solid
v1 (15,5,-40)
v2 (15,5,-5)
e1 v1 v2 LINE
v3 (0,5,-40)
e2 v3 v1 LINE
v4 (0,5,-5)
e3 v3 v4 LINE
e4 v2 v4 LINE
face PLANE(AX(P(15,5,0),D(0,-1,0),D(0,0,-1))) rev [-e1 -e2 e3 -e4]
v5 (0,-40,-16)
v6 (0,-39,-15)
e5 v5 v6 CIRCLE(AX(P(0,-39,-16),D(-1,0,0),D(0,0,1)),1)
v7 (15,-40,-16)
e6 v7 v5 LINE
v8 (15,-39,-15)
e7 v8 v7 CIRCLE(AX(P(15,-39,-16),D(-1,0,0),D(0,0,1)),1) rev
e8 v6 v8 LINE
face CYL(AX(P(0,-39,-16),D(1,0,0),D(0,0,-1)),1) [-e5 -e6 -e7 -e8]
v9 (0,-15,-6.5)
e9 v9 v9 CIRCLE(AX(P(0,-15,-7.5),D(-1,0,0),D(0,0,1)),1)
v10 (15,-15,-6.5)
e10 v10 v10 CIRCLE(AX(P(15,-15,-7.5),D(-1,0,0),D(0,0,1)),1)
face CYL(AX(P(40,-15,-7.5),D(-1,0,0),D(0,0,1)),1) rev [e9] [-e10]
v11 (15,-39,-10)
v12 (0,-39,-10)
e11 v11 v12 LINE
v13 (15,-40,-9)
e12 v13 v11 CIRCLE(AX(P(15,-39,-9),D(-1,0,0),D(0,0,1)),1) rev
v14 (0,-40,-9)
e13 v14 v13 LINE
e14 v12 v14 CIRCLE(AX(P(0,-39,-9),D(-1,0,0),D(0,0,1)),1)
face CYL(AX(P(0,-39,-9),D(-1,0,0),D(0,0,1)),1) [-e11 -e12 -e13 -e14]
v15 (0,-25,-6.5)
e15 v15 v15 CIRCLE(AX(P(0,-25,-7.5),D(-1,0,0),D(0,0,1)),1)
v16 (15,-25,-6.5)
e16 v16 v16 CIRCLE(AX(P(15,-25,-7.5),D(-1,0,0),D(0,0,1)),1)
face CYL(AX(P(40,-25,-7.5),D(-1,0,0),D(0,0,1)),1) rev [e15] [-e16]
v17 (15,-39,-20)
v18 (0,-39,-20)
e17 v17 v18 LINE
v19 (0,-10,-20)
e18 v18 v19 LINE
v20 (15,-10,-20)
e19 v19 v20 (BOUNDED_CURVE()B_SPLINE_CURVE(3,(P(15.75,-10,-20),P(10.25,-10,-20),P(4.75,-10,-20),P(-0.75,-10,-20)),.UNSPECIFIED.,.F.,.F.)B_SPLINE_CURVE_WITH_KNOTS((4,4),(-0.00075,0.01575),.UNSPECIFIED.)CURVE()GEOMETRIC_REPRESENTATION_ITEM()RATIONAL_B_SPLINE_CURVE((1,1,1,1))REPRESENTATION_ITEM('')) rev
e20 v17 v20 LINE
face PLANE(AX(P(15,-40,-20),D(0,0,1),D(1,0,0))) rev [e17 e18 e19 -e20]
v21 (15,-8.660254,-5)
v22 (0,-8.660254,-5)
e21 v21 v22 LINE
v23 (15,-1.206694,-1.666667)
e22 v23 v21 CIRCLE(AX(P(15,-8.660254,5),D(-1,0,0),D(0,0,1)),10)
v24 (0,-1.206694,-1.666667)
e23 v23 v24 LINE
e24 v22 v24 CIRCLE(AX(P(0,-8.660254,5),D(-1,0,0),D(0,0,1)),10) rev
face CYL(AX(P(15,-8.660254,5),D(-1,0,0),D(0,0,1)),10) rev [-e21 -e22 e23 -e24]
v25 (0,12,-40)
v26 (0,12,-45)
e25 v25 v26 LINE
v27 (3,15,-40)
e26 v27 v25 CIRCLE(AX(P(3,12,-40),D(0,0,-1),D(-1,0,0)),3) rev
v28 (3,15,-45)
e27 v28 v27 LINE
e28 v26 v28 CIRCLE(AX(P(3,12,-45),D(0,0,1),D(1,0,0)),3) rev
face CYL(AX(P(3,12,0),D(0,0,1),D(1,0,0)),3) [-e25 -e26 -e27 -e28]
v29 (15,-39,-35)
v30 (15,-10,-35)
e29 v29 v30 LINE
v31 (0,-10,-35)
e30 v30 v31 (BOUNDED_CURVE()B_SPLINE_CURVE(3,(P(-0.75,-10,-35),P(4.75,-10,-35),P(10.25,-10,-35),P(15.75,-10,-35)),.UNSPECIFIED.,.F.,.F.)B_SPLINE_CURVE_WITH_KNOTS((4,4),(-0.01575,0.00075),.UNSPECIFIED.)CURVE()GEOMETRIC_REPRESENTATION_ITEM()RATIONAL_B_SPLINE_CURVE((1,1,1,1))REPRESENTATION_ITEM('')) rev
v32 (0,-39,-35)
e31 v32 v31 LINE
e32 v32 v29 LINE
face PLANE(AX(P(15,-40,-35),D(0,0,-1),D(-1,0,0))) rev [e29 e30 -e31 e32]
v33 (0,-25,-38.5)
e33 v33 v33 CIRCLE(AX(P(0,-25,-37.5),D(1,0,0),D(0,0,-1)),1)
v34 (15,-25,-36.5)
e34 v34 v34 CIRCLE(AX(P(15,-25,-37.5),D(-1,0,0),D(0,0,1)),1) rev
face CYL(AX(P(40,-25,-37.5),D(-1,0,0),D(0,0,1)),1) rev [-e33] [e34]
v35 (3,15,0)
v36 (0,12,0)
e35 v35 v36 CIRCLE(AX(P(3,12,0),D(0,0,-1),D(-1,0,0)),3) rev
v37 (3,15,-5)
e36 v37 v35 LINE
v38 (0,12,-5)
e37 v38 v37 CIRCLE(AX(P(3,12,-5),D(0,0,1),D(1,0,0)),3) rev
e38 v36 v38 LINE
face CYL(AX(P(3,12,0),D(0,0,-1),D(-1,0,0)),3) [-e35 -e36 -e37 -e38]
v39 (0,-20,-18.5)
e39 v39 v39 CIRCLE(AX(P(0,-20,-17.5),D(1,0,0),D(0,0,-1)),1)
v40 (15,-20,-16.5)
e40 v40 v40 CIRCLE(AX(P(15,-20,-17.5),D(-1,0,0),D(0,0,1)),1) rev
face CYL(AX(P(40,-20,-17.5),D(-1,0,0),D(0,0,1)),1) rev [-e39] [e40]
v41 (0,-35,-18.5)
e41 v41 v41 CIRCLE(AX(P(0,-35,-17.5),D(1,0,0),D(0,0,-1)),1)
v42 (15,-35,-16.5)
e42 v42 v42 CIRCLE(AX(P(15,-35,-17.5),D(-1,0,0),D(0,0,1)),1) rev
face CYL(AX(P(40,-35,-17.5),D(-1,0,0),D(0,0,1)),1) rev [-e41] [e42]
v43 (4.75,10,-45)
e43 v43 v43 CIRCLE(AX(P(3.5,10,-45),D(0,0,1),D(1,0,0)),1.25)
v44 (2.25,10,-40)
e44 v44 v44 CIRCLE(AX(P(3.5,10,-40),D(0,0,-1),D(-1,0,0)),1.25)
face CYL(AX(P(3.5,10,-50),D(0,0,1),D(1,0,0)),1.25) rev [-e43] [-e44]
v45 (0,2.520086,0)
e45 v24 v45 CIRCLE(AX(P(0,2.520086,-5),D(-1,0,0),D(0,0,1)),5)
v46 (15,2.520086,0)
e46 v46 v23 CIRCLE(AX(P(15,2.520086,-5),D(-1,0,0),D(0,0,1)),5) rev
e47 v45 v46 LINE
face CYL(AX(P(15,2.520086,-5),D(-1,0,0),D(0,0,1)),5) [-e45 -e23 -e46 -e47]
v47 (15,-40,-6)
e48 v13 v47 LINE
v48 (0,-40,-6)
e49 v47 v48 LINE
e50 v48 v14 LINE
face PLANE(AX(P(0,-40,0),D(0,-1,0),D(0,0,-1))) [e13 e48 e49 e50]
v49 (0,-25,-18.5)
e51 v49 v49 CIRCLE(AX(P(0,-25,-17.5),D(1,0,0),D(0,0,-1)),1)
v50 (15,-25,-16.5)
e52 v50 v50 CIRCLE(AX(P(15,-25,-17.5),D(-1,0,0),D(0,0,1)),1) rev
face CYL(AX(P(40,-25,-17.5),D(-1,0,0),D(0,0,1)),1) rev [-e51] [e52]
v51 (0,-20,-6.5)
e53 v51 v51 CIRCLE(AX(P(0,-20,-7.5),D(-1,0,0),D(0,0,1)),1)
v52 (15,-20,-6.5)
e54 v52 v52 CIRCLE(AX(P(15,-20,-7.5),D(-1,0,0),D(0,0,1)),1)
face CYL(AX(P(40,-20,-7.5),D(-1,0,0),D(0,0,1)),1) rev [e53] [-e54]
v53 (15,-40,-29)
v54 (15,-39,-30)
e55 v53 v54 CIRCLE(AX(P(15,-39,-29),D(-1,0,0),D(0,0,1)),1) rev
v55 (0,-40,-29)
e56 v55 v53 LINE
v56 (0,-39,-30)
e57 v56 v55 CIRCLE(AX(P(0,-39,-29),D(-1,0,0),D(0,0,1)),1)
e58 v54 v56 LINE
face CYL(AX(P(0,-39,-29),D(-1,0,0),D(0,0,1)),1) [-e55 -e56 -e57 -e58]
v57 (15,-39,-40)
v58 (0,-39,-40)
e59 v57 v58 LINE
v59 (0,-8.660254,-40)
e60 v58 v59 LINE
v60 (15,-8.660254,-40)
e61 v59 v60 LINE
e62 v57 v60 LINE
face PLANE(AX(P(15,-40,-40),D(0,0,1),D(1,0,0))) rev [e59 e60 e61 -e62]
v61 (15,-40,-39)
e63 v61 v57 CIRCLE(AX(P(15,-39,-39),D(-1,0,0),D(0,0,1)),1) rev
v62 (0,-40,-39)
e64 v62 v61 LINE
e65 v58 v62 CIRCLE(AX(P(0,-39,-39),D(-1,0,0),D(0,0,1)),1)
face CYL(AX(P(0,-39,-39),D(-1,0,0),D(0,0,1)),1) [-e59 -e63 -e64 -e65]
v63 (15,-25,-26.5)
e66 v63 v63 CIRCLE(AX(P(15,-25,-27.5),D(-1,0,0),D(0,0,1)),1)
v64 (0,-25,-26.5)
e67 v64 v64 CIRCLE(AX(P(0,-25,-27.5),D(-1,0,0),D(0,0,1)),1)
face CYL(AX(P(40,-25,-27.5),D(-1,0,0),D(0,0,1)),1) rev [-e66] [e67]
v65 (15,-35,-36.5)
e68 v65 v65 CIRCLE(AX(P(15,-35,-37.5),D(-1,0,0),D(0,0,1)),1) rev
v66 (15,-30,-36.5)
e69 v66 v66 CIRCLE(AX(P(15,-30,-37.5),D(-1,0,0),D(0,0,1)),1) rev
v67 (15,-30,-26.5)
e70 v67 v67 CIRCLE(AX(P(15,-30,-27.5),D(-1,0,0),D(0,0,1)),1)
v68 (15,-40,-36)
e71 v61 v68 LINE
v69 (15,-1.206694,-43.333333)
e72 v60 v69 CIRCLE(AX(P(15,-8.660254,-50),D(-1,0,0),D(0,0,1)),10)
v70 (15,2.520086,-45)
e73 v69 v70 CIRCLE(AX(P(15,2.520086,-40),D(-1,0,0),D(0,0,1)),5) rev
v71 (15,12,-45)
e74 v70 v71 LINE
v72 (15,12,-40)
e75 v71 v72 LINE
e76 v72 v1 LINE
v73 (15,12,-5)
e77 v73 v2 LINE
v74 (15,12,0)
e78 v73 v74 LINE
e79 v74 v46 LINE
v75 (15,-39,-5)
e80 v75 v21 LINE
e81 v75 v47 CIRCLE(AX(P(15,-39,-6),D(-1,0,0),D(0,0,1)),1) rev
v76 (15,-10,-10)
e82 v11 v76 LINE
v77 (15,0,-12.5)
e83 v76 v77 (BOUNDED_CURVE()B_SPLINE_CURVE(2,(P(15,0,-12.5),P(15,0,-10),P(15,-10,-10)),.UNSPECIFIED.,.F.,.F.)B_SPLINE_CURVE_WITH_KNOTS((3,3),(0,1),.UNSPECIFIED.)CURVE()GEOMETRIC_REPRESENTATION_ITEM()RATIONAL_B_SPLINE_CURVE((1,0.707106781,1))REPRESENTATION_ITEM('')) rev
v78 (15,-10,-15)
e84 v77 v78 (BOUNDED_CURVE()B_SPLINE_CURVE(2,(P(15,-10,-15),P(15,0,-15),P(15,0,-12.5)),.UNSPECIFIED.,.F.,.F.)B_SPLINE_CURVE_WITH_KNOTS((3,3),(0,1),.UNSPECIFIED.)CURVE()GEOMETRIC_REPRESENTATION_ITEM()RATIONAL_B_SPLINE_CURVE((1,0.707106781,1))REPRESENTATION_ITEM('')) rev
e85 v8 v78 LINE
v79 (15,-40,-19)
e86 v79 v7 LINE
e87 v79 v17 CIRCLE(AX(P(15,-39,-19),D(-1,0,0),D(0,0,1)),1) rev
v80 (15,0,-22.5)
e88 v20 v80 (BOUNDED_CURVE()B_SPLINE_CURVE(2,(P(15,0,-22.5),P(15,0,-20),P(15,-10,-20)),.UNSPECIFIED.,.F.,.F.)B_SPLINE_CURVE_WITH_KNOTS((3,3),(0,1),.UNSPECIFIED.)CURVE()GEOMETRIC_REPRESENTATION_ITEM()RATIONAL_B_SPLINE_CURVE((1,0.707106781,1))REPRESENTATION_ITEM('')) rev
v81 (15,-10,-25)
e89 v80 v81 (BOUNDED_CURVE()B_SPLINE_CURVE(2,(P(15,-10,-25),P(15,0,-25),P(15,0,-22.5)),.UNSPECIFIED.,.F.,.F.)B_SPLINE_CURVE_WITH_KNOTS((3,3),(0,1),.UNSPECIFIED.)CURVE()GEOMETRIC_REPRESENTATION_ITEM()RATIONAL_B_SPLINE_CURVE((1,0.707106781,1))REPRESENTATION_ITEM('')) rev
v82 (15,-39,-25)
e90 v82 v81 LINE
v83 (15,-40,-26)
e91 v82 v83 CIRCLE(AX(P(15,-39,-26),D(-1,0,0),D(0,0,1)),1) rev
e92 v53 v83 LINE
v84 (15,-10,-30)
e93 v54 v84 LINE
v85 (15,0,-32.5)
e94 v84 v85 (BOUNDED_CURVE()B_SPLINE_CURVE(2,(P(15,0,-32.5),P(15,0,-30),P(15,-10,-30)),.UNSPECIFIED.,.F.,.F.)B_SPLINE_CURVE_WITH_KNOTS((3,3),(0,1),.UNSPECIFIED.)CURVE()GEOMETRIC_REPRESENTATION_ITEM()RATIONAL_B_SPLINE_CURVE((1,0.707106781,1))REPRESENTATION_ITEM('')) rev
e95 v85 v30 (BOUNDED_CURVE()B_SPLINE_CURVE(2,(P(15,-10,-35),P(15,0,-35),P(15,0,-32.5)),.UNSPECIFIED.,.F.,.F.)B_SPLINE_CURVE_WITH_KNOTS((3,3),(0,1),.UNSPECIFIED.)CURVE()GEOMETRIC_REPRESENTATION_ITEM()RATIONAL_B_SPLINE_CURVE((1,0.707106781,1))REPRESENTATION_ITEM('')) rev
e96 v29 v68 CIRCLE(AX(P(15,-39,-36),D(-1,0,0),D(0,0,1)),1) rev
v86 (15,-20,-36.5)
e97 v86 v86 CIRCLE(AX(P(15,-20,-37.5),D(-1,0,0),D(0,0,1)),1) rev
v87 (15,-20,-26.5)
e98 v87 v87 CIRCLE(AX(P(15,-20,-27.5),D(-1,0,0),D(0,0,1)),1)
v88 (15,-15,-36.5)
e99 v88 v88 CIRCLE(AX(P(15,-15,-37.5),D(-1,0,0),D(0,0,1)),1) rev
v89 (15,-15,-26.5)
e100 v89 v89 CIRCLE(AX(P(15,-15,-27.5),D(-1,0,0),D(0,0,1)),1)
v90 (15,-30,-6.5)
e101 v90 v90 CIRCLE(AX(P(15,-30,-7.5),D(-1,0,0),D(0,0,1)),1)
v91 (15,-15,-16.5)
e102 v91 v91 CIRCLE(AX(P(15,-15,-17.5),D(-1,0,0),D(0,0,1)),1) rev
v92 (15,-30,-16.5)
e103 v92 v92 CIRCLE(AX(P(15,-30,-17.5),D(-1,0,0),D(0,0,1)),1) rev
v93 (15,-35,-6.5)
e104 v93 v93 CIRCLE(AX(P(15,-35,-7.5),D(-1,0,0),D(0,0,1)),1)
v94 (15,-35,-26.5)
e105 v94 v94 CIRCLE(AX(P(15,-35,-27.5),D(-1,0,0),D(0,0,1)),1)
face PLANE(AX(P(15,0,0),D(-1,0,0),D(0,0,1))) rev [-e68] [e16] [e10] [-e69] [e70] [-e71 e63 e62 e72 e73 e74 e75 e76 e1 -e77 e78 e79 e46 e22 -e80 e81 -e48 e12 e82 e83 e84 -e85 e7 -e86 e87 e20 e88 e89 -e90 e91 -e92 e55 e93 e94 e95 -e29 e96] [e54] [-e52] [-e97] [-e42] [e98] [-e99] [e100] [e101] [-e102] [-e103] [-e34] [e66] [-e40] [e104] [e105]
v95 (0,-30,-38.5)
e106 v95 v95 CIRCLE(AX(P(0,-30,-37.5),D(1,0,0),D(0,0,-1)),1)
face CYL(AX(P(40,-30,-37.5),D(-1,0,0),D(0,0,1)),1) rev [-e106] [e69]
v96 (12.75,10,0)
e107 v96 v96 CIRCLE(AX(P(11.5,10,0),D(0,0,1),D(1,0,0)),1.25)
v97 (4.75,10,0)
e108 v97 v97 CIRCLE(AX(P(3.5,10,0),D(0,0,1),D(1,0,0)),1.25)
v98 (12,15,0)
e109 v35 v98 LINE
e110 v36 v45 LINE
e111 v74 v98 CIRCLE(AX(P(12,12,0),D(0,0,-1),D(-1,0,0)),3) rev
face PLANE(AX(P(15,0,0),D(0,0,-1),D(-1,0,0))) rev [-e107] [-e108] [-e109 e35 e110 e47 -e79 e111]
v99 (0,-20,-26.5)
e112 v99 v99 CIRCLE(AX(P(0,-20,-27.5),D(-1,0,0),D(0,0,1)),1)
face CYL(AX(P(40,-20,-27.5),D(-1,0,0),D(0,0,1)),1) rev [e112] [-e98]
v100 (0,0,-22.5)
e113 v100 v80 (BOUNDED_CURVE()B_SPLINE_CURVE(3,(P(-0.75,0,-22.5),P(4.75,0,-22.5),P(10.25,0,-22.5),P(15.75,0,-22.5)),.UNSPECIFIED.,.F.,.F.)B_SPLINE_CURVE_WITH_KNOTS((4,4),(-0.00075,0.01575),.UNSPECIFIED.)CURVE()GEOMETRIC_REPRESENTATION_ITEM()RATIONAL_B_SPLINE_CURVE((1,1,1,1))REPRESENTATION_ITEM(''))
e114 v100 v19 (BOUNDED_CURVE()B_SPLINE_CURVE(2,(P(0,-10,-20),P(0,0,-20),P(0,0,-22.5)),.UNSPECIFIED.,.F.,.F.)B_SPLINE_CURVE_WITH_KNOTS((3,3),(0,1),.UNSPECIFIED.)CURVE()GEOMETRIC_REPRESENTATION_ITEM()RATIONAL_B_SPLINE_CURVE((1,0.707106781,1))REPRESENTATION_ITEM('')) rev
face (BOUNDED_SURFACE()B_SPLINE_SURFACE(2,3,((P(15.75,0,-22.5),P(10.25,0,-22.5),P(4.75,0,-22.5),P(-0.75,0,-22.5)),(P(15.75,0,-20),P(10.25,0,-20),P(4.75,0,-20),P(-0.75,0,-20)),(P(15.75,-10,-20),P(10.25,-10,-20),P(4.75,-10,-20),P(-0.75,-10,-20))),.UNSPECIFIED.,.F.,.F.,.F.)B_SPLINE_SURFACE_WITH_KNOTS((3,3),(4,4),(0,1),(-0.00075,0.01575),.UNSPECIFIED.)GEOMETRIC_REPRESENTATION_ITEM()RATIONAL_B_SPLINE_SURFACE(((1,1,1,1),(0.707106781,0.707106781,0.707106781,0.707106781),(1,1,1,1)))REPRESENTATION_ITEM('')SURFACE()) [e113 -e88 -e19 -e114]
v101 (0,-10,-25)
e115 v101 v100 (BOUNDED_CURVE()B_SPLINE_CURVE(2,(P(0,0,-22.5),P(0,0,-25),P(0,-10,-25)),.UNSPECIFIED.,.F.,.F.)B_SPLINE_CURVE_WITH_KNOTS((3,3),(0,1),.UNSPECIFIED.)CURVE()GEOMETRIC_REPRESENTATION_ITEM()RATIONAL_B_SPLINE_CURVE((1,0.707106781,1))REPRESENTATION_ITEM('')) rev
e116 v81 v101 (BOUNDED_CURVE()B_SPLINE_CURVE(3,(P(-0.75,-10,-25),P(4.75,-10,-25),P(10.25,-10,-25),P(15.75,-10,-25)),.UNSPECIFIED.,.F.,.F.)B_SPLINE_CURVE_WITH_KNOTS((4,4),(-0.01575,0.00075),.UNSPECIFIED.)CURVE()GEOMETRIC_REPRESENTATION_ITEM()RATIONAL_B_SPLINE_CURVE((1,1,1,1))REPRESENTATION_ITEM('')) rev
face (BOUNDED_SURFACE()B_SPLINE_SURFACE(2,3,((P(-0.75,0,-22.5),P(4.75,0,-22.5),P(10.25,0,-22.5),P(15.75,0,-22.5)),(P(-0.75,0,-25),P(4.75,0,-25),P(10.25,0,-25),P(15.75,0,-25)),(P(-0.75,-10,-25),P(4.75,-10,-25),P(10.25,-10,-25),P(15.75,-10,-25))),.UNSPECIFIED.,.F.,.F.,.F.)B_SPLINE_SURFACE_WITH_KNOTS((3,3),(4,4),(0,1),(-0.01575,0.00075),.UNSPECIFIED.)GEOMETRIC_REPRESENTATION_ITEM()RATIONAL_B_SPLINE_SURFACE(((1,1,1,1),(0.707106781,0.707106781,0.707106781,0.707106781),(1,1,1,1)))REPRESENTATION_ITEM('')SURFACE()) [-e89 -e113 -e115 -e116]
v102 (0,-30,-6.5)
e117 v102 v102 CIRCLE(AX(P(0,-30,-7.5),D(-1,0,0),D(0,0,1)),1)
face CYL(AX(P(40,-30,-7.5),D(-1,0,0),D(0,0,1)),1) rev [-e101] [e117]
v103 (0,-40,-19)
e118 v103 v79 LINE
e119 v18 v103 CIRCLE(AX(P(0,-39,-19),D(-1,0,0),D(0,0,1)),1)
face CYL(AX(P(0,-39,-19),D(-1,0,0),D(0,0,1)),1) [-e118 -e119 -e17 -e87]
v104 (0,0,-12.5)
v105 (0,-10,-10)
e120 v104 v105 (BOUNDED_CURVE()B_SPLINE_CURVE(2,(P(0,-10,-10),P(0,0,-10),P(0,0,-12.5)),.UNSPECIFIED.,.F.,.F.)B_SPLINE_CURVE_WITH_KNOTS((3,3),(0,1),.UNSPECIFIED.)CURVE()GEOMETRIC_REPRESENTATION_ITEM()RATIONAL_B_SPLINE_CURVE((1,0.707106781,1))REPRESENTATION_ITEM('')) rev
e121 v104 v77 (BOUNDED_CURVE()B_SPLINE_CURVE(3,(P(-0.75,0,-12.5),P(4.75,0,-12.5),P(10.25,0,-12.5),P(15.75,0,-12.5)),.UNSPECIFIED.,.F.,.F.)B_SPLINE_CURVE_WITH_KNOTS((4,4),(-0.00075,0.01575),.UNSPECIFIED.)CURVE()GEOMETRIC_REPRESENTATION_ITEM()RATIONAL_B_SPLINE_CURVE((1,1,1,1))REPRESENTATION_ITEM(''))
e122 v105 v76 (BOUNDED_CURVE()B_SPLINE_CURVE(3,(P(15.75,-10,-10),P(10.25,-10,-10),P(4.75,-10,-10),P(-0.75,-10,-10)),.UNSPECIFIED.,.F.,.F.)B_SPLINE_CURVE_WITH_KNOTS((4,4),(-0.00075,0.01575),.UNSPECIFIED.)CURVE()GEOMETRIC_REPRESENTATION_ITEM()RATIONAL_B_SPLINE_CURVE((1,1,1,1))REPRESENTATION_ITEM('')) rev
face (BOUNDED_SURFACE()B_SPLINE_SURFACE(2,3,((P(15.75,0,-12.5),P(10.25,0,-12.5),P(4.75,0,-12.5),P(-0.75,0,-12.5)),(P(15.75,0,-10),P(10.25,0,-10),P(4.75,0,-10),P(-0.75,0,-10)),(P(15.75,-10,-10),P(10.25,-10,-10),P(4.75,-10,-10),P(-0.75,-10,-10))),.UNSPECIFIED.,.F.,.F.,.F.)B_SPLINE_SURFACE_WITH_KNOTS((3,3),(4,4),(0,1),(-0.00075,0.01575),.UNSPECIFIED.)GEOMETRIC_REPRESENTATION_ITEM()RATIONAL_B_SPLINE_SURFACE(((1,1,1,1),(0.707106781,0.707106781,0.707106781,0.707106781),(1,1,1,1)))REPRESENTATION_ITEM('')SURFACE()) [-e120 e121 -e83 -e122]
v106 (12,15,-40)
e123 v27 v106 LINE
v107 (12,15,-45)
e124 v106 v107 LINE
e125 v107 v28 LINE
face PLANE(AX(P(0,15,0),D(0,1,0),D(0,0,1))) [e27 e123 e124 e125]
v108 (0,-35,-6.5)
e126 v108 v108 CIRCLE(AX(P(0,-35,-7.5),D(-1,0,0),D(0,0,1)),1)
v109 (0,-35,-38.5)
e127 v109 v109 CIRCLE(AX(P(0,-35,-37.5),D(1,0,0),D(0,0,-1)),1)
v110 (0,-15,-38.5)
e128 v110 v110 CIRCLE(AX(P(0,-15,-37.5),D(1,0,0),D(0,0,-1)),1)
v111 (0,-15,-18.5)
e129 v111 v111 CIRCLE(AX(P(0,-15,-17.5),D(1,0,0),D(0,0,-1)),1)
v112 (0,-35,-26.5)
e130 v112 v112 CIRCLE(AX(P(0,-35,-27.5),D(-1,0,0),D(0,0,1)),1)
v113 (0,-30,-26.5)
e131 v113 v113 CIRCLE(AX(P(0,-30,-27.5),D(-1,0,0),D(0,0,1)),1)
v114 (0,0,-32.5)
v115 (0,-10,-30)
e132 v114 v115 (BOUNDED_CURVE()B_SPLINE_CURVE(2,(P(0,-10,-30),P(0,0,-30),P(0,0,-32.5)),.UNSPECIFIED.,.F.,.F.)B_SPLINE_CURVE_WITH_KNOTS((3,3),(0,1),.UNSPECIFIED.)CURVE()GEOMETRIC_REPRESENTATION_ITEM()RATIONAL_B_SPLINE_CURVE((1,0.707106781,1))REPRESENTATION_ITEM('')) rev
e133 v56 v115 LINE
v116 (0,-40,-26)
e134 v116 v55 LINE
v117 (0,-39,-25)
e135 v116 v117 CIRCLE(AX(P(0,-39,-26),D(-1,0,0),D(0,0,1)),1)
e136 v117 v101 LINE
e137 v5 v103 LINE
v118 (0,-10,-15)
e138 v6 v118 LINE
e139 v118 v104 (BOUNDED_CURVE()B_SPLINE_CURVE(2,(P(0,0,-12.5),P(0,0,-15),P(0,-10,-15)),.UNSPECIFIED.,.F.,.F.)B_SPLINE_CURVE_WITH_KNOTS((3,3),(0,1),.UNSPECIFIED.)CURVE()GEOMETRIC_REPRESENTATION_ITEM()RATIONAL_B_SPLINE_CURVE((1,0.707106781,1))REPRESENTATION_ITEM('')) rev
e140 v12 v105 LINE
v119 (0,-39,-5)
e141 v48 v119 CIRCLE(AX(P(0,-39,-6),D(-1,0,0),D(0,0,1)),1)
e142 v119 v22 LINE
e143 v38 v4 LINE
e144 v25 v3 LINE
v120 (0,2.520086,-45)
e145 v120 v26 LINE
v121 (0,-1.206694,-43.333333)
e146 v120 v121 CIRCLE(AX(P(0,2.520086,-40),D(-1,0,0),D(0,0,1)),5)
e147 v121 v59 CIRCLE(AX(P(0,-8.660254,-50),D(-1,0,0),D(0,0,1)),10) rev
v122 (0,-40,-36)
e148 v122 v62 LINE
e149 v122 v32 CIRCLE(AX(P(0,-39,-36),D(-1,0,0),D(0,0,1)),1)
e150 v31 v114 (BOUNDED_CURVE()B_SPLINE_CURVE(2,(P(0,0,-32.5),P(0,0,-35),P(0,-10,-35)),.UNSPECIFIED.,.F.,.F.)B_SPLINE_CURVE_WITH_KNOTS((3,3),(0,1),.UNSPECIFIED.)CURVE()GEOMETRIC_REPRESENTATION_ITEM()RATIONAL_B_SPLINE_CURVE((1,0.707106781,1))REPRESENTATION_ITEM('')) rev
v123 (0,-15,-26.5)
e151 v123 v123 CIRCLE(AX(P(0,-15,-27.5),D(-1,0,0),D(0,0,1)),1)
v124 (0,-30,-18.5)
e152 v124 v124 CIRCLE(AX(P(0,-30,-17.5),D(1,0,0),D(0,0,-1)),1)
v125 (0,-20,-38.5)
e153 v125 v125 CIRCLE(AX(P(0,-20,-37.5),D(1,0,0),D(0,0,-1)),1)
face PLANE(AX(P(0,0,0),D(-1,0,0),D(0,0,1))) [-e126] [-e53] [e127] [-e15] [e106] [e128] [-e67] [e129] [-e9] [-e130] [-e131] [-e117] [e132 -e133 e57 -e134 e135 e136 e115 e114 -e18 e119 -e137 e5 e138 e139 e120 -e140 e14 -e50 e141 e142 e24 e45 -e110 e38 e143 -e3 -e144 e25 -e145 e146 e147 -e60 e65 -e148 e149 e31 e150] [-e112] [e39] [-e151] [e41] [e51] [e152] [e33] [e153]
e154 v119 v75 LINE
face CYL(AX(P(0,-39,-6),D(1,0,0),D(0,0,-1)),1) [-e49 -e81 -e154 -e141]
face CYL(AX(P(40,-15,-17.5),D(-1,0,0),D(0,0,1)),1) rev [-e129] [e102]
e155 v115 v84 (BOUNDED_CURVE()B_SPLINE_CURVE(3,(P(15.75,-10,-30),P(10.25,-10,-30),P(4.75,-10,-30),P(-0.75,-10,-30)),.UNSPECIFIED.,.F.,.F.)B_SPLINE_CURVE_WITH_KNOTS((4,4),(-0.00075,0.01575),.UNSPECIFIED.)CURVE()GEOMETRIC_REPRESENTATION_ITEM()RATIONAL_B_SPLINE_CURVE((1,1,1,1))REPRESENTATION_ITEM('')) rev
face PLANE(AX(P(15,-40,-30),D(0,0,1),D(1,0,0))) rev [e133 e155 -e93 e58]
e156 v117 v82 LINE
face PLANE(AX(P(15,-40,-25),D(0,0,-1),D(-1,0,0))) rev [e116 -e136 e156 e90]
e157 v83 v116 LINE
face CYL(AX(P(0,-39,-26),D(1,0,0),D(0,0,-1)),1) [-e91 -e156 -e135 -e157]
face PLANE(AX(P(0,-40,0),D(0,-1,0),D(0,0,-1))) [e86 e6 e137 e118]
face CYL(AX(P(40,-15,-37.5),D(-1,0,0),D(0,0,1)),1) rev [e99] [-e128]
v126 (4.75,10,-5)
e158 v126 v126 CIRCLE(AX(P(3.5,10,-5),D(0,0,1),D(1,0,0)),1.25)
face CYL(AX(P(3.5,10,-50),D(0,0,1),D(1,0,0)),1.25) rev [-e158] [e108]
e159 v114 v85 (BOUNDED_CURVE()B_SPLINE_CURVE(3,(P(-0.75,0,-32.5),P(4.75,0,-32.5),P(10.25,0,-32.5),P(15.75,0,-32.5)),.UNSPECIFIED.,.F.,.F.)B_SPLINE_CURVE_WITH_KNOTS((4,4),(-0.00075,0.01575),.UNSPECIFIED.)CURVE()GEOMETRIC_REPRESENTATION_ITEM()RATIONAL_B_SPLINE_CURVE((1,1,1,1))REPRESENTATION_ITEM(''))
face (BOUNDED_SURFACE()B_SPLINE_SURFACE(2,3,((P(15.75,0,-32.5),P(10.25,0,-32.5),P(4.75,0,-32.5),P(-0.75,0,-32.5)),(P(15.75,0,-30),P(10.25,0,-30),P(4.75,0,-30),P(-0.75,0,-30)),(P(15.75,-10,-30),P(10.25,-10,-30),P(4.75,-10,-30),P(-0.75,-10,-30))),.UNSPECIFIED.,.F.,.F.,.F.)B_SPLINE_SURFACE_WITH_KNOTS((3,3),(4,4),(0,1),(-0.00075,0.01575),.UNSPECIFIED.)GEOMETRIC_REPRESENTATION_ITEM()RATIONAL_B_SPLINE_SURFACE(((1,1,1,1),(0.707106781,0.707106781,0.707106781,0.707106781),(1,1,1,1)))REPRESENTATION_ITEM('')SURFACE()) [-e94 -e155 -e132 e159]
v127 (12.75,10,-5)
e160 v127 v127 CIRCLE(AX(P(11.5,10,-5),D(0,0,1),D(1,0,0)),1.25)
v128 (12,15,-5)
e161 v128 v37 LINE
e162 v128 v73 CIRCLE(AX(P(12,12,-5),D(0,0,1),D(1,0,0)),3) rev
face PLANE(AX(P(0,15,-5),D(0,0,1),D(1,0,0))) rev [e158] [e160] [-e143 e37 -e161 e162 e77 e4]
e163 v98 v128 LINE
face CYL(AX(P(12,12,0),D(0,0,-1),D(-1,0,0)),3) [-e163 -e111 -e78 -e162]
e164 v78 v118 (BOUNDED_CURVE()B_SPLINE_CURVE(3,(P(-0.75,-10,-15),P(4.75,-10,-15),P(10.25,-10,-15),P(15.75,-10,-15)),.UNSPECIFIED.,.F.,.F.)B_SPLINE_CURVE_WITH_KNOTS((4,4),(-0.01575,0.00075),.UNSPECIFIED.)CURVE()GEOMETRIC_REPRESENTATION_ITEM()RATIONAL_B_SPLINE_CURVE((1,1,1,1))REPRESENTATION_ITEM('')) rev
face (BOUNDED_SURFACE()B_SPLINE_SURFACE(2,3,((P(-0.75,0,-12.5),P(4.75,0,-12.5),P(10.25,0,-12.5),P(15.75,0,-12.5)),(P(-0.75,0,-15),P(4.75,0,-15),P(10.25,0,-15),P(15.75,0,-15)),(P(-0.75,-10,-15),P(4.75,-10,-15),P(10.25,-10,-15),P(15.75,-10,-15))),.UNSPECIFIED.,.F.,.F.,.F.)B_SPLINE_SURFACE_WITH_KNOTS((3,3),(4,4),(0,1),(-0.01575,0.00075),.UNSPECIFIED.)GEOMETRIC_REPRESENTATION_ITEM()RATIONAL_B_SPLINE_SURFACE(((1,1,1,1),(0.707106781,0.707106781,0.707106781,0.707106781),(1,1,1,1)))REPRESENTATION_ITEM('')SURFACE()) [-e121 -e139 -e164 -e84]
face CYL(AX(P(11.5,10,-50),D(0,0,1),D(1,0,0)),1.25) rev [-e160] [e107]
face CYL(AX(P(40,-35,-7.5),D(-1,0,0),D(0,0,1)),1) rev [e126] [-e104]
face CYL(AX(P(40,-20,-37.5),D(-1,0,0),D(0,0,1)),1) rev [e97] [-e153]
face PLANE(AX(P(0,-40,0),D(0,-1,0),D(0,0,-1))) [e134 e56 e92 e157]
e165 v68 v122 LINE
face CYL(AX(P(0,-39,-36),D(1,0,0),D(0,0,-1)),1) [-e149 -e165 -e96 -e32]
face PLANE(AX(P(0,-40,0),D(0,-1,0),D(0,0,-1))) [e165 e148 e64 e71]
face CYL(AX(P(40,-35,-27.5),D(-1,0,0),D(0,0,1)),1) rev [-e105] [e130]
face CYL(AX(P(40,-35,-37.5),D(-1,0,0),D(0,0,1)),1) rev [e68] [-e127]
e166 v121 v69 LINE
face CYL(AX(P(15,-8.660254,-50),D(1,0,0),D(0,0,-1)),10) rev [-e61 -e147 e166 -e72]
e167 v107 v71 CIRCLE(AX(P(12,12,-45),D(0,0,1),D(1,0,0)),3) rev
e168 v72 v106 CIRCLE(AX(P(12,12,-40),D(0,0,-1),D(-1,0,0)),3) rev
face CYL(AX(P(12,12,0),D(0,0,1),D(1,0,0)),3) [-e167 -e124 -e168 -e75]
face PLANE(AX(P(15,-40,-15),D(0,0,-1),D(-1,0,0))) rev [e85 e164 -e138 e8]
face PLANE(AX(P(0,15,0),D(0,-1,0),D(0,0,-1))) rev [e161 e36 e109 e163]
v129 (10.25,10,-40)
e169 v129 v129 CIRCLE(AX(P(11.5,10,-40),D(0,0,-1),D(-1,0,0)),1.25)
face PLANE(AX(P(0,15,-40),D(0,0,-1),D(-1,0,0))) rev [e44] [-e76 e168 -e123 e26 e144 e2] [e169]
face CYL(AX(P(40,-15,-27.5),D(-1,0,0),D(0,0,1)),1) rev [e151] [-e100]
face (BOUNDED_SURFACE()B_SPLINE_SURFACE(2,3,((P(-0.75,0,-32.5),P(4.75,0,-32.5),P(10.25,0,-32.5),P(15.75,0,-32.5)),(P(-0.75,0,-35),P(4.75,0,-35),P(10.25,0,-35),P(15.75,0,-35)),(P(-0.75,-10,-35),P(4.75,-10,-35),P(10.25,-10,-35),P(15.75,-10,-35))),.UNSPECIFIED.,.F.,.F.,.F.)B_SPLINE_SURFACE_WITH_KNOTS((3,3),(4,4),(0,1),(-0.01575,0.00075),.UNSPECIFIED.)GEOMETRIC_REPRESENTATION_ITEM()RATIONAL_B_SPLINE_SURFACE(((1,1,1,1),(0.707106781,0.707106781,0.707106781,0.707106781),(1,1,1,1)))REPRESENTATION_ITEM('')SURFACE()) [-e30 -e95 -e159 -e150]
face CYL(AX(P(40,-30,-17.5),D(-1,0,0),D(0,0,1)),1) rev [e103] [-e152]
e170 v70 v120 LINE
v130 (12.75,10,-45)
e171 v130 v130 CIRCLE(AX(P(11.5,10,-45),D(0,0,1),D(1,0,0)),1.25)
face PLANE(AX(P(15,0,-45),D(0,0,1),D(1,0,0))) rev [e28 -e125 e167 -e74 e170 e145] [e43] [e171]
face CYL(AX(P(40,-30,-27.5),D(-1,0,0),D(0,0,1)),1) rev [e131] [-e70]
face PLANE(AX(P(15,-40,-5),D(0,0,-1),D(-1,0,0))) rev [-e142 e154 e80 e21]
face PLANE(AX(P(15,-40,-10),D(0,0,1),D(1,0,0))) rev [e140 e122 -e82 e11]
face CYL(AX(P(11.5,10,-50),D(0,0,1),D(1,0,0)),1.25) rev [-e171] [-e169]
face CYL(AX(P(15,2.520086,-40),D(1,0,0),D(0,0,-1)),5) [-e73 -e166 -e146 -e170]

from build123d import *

# Parameters (mm, degrees)
SKETCH_3_W               = 45
SKETCH_3_H               = 5
EXTRUDE_2_DEPTH          = 15
SKETCH_4_W               = 15
SKETCH_4_H               = 5
EXTRUDE_3_DEPTH          = 10
SKETCH_6_R               = 1.25
CUT_EXTRUDE_3_DEPTH      = 50
FILLET_3_R               = 3
SKETCH_7_W               = 15
SKETCH_7_H               = 5
EXTRUDE_4_DEPTH          = 40
FILLET_4_R               = 10
FILLET_5_R               = 5
FILLET_6_R               = 1
FILLET_7_SIZE            = 10
FILLET_7_SIZE_2          = 2.5
SKETCH_8_R               = 1
CUT_EXTRUDE_4_DEPTH      = 40
MIRROR_2_COPY_1_SKETCH_R = 1
MIRROR_2_COPY_1_DEPTH    = 40
MIRROR_2_COPY_2_SKETCH_R = 1
MIRROR_2_COPY_2_DEPTH    = 40
MIRROR_2_COPY_3_SKETCH_R = 1
MIRROR_2_COPY_3_DEPTH    = 40


with BuildPart() as part:
    # 草图3 → 凸台-拉伸2 (new body)
    with BuildSketch(Plane(origin=(0, 0, 0), x_dir=(0, 0, -1), z_dir=(1, 0, 0))):
        with Locations((22.5, 2.5)):
            Rectangle(SKETCH_3_W, SKETCH_3_H)
    extrude(amount=EXTRUDE_2_DEPTH)

    # 草图4 → 凸台-拉伸3 (add)
    with BuildSketch(Plane(origin=(0, 5, 0), x_dir=(1, 0, 0), z_dir=(0, 1, 0))):
        with Locations((7.5, 42.5)):
            Rectangle(SKETCH_4_W, SKETCH_4_H)
        with Locations((7.5, 2.5)):
            Rectangle(SKETCH_4_W, SKETCH_4_H)
    extrude(amount=EXTRUDE_3_DEPTH)

    # 草图6 → 切除-拉伸3 (cut)
    with BuildSketch(Plane.XY):
        with Locations((3.5, 10)):
            Circle(SKETCH_6_R)
        with Locations((11.5, 10)):
            Circle(SKETCH_6_R)
    extrude(amount=-CUT_EXTRUDE_3_DEPTH, mode=Mode.SUBTRACT)

    # 圆角3
    fillet_3_edges = [part.edges().sort_by_distance(p)[0] for p in [
        (0, 15, -42.5),
        (15, 15, -42.5),
        (0, 15, -2.5),
        (15, 15, -2.5),
    ]]
    fillet(fillet_3_edges, radius=FILLET_3_R)

    # 草图7 → 凸台-拉伸4 (add)
    with BuildSketch(Plane(origin=(0, 0, 0), x_dir=(-1, 0, 0), z_dir=(0, -1, 0))):
        with Locations((-7.5, 27.5)):
            Rectangle(SKETCH_7_W, SKETCH_7_H)
        with Locations((-7.5, 17.5)):
            Rectangle(SKETCH_7_W, SKETCH_7_H)
        with Locations((-7.5, 37.5)):
            Rectangle(SKETCH_7_W, SKETCH_7_H)
        with Locations((-7.5, 7.5)):
            Rectangle(SKETCH_7_W, SKETCH_7_H)
    extrude(amount=EXTRUDE_4_DEPTH)

    # 圆角4
    # the kernel refuses this fillet: 10 mm, written as the material it adds along each edge
    with BuildSketch(Plane(origin=(0, 0, -5), x_dir=(0, 0, 1), z_dir=(1, 0, 0)), Plane(origin=(15, 0, -40), x_dir=(0, 0, -1), z_dir=(-1, 0, 0))) as fillet_4_piece_1:
        with BuildLine():
            CenterArc((10, 8.660254038), FILLET_4_R, 180, 60)
            Line((0, 8.660254038), (-0.2, 8.660254038))
            Line((-0.2, 8.660254038), (-0.2, 0))
            Line((-0.2, 0), (0, -0.2))
            ThreePointArc((0, -0.2), (2.5, -0.2), (4.9, -0.173205081))
            Line((4.9, -0.173205081), (5, 0))
        make_face()
    extrude(amount=15)

    # 圆角5
    fillet_5_edges = [part.edges().sort_by_distance(p)[0] for p in [
        (7.5, 0, -45),
        (7.5, 0, 0),
    ]]
    fillet(fillet_5_edges, radius=FILLET_5_R)

    # 圆角6
    fillet_6_edges = [part.edges().sort_by_distance(p)[0] for p in [
        (7.5, -40, -15),
        (7.5, -40, -20),
        (7.5, -40, -35),
        (7.5, -40, -40),
        (7.5, -40, -5),
        (7.5, -40, -10),
        (7.5, -40, -25),
        (7.5, -40, -30),
    ]]
    fillet(fillet_6_edges, radius=FILLET_6_R)

    # 圆角7
    # an asymmetric fillet: 10, 2.5 mm, written as the material it adds along each edge
    with BuildSketch(Plane(origin=(15, 0, -10), x_dir=(0, -1, 0), z_dir=(-1, 0, 0)), Plane(origin=(15, 0, -20), x_dir=(0, -1, 0), z_dir=(-1, 0, 0)), Plane(origin=(15, 0, -30), x_dir=(0, -1, 0), z_dir=(-1, 0, 0)), Plane(origin=(0, 0, -35), x_dir=(0, -1, 0), z_dir=(1, 0, 0))) as fillet_7_piece_1:
        with BuildLine():
            Bezier((FILLET_7_SIZE, 0), (0, 0), (0, -FILLET_7_SIZE_2), weights=[1, 0.707106781, 1])
            Line((0, -FILLET_7_SIZE_2), (0, 0))
            Line((0, 0), (FILLET_7_SIZE, 0))
        make_face()
    extrude(amount=15)
    with BuildSketch(Plane(origin=(0, 0, -15), x_dir=(0, 0, 1), z_dir=(1, 0, 0)), Plane(origin=(0, 0, -25), x_dir=(0, 0, 1), z_dir=(1, 0, 0))) as fillet_7_piece_2:
        with BuildLine():
            Bezier((FILLET_7_SIZE_2, 0), (0, 0), (0, FILLET_7_SIZE), weights=[1, 0.707106781, 1])
            Line((0, FILLET_7_SIZE), (0, 0))
            Line((0, 0), (FILLET_7_SIZE_2, 0))
        make_face()
    extrude(amount=15)

    # 草图8 → 切除-拉伸4 (cut)
    with BuildSketch(Plane.ZY):
        with Locations((-27.5, -15)):
            Circle(SKETCH_8_R)
        with Locations((-27.5, -20)):
            Circle(SKETCH_8_R)
        with Locations((-27.5, -25)):
            Circle(SKETCH_8_R)
        with Locations((-27.5, -30)):
            Circle(SKETCH_8_R)
        with Locations((-27.5, -35)):
            Circle(SKETCH_8_R)
    cut_extrude_4 = extrude(amount=-CUT_EXTRUDE_4_DEPTH, mode=Mode.SUBTRACT)

    # 镜向1: 切除-拉伸4 across plane
    add(cut_extrude_4.mirror(Plane(origin=(0, 0, -32.5), x_dir=(1, 0, 0), z_dir=(0, 0, -1))), mode=Mode.SUBTRACT)

    # 镜向1 at the second plane: 切除-拉伸4 across plane
    add(cut_extrude_4.mirror(Plane(origin=(0, 0, -22.5), x_dir=(1, 0, 0), z_dir=(0, 0, -1))), mode=Mode.SUBTRACT)

    # 镜向2 copy 1 sketch → 镜向2 copy 1 (cut)
    with BuildSketch(Plane(origin=(0, 0, 20), x_dir=(0, 0, 1), z_dir=(-1, 0, 0))):
        with Locations((-27.5, -15)):
            Circle(MIRROR_2_COPY_1_SKETCH_R)
        with Locations((-27.5, -20)):
            Circle(MIRROR_2_COPY_1_SKETCH_R)
        with Locations((-27.5, -25)):
            Circle(MIRROR_2_COPY_1_SKETCH_R)
        with Locations((-27.5, -30)):
            Circle(MIRROR_2_COPY_1_SKETCH_R)
        with Locations((-27.5, -35)):
            Circle(MIRROR_2_COPY_1_SKETCH_R)
    extrude(amount=-MIRROR_2_COPY_1_DEPTH, mode=Mode.SUBTRACT)

    # 镜向2 copy 2 sketch → 镜向2 copy 2 (cut)
    with BuildSketch(Plane.ZY):
        with Locations((-27.5, -15)):
            Circle(MIRROR_2_COPY_2_SKETCH_R)
        with Locations((-27.5, -20)):
            Circle(MIRROR_2_COPY_2_SKETCH_R)
        with Locations((-27.5, -25)):
            Circle(MIRROR_2_COPY_2_SKETCH_R)
        with Locations((-27.5, -30)):
            Circle(MIRROR_2_COPY_2_SKETCH_R)
        with Locations((-27.5, -35)):
            Circle(MIRROR_2_COPY_2_SKETCH_R)
    extrude(amount=-MIRROR_2_COPY_2_DEPTH, mode=Mode.SUBTRACT)

    # 镜向2 copy 3 sketch → 镜向2 copy 3 (cut)
    with BuildSketch(Plane(origin=(0, 0, -45), x_dir=(0, 0, -1), z_dir=(-1, 0, 0))):
        with Locations((-27.5, 15)):
            Circle(MIRROR_2_COPY_3_SKETCH_R)
        with Locations((-27.5, 20)):
            Circle(MIRROR_2_COPY_3_SKETCH_R)
        with Locations((-27.5, 25)):
            Circle(MIRROR_2_COPY_3_SKETCH_R)
        with Locations((-27.5, 30)):
            Circle(MIRROR_2_COPY_3_SKETCH_R)
        with Locations((-27.5, 35)):
            Circle(MIRROR_2_COPY_3_SKETCH_R)
    extrude(amount=-MIRROR_2_COPY_3_DEPTH, mode=Mode.SUBTRACT)


solid = part.part
